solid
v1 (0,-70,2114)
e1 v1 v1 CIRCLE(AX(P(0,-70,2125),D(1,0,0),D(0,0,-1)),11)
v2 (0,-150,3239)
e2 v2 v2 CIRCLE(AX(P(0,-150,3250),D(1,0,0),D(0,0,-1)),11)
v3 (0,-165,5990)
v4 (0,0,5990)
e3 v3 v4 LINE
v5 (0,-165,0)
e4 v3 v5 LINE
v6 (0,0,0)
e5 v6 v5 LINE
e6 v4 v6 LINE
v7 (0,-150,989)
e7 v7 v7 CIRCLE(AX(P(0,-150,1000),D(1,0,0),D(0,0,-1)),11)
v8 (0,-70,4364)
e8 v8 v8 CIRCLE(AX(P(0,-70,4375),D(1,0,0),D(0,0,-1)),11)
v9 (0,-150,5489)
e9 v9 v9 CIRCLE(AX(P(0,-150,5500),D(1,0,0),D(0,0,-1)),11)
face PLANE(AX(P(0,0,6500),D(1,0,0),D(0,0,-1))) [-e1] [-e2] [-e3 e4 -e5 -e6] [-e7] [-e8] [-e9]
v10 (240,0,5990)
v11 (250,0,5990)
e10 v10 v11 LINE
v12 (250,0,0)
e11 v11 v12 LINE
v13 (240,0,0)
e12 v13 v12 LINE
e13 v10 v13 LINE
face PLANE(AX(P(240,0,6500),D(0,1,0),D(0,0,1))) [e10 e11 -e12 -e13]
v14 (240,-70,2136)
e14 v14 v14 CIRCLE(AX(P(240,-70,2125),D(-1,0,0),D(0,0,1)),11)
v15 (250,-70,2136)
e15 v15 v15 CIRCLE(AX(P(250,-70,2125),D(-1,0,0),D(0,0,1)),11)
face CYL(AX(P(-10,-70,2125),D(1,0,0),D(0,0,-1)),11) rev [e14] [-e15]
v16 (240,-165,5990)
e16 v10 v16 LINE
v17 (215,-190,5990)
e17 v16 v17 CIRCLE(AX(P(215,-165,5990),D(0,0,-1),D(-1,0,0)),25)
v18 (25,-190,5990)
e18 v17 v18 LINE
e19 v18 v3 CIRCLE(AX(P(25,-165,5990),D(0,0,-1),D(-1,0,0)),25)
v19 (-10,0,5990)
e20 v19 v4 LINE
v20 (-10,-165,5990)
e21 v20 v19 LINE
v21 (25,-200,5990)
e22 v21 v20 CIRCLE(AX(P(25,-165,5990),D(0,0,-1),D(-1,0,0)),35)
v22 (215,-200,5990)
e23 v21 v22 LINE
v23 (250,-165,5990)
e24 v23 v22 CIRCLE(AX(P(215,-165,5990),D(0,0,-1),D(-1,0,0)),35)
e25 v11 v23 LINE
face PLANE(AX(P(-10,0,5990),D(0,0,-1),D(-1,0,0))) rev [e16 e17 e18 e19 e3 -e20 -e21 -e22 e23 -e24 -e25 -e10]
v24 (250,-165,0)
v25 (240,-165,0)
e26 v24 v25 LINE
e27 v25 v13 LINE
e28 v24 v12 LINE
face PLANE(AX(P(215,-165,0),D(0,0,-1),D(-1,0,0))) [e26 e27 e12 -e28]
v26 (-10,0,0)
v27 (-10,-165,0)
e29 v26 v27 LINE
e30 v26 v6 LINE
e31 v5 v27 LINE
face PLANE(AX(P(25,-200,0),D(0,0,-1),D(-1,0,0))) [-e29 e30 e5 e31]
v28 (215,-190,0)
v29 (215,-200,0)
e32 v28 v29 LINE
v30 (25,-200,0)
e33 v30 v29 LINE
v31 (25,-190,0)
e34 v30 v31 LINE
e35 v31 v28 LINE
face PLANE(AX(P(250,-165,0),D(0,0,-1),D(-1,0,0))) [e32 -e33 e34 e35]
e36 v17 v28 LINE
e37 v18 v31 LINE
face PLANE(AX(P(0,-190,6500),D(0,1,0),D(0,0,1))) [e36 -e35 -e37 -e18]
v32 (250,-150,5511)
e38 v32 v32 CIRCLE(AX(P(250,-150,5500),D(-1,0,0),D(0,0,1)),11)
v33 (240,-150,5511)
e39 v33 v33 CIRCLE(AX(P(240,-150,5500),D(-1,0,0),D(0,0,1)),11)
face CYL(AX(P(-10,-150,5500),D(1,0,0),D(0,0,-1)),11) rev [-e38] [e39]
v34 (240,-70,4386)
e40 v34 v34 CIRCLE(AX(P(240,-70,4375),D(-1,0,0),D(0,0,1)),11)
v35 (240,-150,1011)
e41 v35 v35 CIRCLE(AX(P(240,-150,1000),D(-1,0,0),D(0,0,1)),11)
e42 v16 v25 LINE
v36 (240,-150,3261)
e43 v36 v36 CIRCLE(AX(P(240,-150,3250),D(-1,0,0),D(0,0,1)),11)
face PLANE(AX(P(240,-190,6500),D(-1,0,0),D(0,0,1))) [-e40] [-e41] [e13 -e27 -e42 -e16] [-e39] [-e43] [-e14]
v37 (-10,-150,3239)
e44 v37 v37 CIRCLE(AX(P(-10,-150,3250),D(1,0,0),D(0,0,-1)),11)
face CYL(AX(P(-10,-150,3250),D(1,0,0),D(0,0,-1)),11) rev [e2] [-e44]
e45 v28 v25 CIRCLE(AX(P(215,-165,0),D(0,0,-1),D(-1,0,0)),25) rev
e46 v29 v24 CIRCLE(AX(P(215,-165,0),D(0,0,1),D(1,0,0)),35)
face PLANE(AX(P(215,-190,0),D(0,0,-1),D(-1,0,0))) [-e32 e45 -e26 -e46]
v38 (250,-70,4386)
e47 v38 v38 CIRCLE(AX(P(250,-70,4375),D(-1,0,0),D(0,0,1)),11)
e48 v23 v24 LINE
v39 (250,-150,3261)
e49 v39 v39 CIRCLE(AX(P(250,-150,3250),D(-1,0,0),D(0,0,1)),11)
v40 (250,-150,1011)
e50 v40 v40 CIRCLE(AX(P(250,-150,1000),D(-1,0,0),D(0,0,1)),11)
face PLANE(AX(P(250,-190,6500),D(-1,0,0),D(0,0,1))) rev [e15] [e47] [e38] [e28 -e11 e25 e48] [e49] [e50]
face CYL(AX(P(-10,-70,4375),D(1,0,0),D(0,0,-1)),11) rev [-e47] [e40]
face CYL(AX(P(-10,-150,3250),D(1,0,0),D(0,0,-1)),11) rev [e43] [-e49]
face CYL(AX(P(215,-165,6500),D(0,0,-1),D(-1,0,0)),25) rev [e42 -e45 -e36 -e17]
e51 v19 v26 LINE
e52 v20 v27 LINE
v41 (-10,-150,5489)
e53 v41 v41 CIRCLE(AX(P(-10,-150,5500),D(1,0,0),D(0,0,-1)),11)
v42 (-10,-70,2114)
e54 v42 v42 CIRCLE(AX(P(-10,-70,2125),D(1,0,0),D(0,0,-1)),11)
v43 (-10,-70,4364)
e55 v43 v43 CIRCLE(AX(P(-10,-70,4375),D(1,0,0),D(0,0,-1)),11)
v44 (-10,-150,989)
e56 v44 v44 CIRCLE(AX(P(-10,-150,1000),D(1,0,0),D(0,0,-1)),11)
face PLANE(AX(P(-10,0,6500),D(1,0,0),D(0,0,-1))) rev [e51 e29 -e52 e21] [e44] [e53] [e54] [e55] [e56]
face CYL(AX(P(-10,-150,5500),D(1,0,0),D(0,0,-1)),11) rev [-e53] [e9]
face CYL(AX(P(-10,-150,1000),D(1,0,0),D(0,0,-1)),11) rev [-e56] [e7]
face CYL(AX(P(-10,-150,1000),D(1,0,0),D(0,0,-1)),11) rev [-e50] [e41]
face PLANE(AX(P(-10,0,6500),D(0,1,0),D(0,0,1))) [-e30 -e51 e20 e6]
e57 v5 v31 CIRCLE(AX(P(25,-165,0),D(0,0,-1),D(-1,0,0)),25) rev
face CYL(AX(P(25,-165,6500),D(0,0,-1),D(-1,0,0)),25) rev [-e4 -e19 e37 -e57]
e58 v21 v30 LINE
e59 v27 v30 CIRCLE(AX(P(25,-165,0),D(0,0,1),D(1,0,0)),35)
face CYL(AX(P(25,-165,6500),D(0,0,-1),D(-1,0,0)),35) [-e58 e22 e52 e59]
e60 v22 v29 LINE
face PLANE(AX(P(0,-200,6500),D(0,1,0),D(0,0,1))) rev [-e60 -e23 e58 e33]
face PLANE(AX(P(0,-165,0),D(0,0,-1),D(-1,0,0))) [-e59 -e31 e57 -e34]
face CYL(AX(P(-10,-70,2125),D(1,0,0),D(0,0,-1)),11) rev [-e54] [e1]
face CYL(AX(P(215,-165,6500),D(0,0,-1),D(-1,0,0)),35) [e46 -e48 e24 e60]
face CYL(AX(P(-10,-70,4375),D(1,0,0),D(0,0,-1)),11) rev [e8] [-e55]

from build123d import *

# Parameters (mm, degrees)
TABAN_FLAN_1_DEPTH         = 6500
KES_EKSTR_ZYON1_DEPTH      = 6509.271659972
KES_EKSTR_ZYON1_DEPTH_BACK = 6509.271659972
IZIM6_R                    = 11
IZIM6_W                    = 510
IZIM6_H                    = 200


# Sheet-metal steps are written as plain solids
with BuildPart() as part:
    # Çizim1 → Taban-Flanş1 (new body)
    with BuildSketch(Plane.XY):
        with BuildLine():
            Line((0, 0), (0, -165))
            ThreePointArc((0, -165), (7.32233047, -182.67766953), (25, -190))
            Line((25, -190), (215, -190))
            ThreePointArc((215, -190), (232.67766953, -182.67766953), (240, -165))
            Line((240, -165), (240, 0))
            Line((240, 0), (250, 0))
            Line((250, 0), (250, -165))
            ThreePointArc((250, -165), (239.748737342, -189.748737342), (215, -200))
            Line((215, -200), (25, -200))
            ThreePointArc((25, -200), (0.251262658, -189.748737342), (-10, -165))
            Line((-10, -165), (-10, 0))
            Line((-10, 0), (0, 0))
        make_face()
    extrude(amount=TABAN_FLAN_1_DEPTH)

    # Çizim6 → Kes-Ekstrüzyon1 (cut, two sides: drawn at the far end of the back side and taken through both)
    with BuildSketch(Plane(origin=(250, 0, 0), x_dir=(0, 0, -1), z_dir=(1, 0, 0)).offset(-KES_EKSTR_ZYON1_DEPTH_BACK)):
        with Locations((-1000, -150)):
            Circle(IZIM6_R)
        with Locations((-3250, -150)):
            Circle(IZIM6_R)
        with Locations((-5500, -150)):
            Circle(IZIM6_R)
        with Locations((-2125, -70)):
            Circle(IZIM6_R)
        with Locations((-4375, -70)):
            Circle(IZIM6_R)
        with Locations((-6245, -100)):
            Rectangle(IZIM6_W, IZIM6_H)
    extrude(amount=KES_EKSTR_ZYON1_DEPTH + KES_EKSTR_ZYON1_DEPTH_BACK, mode=Mode.SUBTRACT)


solid = part.part
